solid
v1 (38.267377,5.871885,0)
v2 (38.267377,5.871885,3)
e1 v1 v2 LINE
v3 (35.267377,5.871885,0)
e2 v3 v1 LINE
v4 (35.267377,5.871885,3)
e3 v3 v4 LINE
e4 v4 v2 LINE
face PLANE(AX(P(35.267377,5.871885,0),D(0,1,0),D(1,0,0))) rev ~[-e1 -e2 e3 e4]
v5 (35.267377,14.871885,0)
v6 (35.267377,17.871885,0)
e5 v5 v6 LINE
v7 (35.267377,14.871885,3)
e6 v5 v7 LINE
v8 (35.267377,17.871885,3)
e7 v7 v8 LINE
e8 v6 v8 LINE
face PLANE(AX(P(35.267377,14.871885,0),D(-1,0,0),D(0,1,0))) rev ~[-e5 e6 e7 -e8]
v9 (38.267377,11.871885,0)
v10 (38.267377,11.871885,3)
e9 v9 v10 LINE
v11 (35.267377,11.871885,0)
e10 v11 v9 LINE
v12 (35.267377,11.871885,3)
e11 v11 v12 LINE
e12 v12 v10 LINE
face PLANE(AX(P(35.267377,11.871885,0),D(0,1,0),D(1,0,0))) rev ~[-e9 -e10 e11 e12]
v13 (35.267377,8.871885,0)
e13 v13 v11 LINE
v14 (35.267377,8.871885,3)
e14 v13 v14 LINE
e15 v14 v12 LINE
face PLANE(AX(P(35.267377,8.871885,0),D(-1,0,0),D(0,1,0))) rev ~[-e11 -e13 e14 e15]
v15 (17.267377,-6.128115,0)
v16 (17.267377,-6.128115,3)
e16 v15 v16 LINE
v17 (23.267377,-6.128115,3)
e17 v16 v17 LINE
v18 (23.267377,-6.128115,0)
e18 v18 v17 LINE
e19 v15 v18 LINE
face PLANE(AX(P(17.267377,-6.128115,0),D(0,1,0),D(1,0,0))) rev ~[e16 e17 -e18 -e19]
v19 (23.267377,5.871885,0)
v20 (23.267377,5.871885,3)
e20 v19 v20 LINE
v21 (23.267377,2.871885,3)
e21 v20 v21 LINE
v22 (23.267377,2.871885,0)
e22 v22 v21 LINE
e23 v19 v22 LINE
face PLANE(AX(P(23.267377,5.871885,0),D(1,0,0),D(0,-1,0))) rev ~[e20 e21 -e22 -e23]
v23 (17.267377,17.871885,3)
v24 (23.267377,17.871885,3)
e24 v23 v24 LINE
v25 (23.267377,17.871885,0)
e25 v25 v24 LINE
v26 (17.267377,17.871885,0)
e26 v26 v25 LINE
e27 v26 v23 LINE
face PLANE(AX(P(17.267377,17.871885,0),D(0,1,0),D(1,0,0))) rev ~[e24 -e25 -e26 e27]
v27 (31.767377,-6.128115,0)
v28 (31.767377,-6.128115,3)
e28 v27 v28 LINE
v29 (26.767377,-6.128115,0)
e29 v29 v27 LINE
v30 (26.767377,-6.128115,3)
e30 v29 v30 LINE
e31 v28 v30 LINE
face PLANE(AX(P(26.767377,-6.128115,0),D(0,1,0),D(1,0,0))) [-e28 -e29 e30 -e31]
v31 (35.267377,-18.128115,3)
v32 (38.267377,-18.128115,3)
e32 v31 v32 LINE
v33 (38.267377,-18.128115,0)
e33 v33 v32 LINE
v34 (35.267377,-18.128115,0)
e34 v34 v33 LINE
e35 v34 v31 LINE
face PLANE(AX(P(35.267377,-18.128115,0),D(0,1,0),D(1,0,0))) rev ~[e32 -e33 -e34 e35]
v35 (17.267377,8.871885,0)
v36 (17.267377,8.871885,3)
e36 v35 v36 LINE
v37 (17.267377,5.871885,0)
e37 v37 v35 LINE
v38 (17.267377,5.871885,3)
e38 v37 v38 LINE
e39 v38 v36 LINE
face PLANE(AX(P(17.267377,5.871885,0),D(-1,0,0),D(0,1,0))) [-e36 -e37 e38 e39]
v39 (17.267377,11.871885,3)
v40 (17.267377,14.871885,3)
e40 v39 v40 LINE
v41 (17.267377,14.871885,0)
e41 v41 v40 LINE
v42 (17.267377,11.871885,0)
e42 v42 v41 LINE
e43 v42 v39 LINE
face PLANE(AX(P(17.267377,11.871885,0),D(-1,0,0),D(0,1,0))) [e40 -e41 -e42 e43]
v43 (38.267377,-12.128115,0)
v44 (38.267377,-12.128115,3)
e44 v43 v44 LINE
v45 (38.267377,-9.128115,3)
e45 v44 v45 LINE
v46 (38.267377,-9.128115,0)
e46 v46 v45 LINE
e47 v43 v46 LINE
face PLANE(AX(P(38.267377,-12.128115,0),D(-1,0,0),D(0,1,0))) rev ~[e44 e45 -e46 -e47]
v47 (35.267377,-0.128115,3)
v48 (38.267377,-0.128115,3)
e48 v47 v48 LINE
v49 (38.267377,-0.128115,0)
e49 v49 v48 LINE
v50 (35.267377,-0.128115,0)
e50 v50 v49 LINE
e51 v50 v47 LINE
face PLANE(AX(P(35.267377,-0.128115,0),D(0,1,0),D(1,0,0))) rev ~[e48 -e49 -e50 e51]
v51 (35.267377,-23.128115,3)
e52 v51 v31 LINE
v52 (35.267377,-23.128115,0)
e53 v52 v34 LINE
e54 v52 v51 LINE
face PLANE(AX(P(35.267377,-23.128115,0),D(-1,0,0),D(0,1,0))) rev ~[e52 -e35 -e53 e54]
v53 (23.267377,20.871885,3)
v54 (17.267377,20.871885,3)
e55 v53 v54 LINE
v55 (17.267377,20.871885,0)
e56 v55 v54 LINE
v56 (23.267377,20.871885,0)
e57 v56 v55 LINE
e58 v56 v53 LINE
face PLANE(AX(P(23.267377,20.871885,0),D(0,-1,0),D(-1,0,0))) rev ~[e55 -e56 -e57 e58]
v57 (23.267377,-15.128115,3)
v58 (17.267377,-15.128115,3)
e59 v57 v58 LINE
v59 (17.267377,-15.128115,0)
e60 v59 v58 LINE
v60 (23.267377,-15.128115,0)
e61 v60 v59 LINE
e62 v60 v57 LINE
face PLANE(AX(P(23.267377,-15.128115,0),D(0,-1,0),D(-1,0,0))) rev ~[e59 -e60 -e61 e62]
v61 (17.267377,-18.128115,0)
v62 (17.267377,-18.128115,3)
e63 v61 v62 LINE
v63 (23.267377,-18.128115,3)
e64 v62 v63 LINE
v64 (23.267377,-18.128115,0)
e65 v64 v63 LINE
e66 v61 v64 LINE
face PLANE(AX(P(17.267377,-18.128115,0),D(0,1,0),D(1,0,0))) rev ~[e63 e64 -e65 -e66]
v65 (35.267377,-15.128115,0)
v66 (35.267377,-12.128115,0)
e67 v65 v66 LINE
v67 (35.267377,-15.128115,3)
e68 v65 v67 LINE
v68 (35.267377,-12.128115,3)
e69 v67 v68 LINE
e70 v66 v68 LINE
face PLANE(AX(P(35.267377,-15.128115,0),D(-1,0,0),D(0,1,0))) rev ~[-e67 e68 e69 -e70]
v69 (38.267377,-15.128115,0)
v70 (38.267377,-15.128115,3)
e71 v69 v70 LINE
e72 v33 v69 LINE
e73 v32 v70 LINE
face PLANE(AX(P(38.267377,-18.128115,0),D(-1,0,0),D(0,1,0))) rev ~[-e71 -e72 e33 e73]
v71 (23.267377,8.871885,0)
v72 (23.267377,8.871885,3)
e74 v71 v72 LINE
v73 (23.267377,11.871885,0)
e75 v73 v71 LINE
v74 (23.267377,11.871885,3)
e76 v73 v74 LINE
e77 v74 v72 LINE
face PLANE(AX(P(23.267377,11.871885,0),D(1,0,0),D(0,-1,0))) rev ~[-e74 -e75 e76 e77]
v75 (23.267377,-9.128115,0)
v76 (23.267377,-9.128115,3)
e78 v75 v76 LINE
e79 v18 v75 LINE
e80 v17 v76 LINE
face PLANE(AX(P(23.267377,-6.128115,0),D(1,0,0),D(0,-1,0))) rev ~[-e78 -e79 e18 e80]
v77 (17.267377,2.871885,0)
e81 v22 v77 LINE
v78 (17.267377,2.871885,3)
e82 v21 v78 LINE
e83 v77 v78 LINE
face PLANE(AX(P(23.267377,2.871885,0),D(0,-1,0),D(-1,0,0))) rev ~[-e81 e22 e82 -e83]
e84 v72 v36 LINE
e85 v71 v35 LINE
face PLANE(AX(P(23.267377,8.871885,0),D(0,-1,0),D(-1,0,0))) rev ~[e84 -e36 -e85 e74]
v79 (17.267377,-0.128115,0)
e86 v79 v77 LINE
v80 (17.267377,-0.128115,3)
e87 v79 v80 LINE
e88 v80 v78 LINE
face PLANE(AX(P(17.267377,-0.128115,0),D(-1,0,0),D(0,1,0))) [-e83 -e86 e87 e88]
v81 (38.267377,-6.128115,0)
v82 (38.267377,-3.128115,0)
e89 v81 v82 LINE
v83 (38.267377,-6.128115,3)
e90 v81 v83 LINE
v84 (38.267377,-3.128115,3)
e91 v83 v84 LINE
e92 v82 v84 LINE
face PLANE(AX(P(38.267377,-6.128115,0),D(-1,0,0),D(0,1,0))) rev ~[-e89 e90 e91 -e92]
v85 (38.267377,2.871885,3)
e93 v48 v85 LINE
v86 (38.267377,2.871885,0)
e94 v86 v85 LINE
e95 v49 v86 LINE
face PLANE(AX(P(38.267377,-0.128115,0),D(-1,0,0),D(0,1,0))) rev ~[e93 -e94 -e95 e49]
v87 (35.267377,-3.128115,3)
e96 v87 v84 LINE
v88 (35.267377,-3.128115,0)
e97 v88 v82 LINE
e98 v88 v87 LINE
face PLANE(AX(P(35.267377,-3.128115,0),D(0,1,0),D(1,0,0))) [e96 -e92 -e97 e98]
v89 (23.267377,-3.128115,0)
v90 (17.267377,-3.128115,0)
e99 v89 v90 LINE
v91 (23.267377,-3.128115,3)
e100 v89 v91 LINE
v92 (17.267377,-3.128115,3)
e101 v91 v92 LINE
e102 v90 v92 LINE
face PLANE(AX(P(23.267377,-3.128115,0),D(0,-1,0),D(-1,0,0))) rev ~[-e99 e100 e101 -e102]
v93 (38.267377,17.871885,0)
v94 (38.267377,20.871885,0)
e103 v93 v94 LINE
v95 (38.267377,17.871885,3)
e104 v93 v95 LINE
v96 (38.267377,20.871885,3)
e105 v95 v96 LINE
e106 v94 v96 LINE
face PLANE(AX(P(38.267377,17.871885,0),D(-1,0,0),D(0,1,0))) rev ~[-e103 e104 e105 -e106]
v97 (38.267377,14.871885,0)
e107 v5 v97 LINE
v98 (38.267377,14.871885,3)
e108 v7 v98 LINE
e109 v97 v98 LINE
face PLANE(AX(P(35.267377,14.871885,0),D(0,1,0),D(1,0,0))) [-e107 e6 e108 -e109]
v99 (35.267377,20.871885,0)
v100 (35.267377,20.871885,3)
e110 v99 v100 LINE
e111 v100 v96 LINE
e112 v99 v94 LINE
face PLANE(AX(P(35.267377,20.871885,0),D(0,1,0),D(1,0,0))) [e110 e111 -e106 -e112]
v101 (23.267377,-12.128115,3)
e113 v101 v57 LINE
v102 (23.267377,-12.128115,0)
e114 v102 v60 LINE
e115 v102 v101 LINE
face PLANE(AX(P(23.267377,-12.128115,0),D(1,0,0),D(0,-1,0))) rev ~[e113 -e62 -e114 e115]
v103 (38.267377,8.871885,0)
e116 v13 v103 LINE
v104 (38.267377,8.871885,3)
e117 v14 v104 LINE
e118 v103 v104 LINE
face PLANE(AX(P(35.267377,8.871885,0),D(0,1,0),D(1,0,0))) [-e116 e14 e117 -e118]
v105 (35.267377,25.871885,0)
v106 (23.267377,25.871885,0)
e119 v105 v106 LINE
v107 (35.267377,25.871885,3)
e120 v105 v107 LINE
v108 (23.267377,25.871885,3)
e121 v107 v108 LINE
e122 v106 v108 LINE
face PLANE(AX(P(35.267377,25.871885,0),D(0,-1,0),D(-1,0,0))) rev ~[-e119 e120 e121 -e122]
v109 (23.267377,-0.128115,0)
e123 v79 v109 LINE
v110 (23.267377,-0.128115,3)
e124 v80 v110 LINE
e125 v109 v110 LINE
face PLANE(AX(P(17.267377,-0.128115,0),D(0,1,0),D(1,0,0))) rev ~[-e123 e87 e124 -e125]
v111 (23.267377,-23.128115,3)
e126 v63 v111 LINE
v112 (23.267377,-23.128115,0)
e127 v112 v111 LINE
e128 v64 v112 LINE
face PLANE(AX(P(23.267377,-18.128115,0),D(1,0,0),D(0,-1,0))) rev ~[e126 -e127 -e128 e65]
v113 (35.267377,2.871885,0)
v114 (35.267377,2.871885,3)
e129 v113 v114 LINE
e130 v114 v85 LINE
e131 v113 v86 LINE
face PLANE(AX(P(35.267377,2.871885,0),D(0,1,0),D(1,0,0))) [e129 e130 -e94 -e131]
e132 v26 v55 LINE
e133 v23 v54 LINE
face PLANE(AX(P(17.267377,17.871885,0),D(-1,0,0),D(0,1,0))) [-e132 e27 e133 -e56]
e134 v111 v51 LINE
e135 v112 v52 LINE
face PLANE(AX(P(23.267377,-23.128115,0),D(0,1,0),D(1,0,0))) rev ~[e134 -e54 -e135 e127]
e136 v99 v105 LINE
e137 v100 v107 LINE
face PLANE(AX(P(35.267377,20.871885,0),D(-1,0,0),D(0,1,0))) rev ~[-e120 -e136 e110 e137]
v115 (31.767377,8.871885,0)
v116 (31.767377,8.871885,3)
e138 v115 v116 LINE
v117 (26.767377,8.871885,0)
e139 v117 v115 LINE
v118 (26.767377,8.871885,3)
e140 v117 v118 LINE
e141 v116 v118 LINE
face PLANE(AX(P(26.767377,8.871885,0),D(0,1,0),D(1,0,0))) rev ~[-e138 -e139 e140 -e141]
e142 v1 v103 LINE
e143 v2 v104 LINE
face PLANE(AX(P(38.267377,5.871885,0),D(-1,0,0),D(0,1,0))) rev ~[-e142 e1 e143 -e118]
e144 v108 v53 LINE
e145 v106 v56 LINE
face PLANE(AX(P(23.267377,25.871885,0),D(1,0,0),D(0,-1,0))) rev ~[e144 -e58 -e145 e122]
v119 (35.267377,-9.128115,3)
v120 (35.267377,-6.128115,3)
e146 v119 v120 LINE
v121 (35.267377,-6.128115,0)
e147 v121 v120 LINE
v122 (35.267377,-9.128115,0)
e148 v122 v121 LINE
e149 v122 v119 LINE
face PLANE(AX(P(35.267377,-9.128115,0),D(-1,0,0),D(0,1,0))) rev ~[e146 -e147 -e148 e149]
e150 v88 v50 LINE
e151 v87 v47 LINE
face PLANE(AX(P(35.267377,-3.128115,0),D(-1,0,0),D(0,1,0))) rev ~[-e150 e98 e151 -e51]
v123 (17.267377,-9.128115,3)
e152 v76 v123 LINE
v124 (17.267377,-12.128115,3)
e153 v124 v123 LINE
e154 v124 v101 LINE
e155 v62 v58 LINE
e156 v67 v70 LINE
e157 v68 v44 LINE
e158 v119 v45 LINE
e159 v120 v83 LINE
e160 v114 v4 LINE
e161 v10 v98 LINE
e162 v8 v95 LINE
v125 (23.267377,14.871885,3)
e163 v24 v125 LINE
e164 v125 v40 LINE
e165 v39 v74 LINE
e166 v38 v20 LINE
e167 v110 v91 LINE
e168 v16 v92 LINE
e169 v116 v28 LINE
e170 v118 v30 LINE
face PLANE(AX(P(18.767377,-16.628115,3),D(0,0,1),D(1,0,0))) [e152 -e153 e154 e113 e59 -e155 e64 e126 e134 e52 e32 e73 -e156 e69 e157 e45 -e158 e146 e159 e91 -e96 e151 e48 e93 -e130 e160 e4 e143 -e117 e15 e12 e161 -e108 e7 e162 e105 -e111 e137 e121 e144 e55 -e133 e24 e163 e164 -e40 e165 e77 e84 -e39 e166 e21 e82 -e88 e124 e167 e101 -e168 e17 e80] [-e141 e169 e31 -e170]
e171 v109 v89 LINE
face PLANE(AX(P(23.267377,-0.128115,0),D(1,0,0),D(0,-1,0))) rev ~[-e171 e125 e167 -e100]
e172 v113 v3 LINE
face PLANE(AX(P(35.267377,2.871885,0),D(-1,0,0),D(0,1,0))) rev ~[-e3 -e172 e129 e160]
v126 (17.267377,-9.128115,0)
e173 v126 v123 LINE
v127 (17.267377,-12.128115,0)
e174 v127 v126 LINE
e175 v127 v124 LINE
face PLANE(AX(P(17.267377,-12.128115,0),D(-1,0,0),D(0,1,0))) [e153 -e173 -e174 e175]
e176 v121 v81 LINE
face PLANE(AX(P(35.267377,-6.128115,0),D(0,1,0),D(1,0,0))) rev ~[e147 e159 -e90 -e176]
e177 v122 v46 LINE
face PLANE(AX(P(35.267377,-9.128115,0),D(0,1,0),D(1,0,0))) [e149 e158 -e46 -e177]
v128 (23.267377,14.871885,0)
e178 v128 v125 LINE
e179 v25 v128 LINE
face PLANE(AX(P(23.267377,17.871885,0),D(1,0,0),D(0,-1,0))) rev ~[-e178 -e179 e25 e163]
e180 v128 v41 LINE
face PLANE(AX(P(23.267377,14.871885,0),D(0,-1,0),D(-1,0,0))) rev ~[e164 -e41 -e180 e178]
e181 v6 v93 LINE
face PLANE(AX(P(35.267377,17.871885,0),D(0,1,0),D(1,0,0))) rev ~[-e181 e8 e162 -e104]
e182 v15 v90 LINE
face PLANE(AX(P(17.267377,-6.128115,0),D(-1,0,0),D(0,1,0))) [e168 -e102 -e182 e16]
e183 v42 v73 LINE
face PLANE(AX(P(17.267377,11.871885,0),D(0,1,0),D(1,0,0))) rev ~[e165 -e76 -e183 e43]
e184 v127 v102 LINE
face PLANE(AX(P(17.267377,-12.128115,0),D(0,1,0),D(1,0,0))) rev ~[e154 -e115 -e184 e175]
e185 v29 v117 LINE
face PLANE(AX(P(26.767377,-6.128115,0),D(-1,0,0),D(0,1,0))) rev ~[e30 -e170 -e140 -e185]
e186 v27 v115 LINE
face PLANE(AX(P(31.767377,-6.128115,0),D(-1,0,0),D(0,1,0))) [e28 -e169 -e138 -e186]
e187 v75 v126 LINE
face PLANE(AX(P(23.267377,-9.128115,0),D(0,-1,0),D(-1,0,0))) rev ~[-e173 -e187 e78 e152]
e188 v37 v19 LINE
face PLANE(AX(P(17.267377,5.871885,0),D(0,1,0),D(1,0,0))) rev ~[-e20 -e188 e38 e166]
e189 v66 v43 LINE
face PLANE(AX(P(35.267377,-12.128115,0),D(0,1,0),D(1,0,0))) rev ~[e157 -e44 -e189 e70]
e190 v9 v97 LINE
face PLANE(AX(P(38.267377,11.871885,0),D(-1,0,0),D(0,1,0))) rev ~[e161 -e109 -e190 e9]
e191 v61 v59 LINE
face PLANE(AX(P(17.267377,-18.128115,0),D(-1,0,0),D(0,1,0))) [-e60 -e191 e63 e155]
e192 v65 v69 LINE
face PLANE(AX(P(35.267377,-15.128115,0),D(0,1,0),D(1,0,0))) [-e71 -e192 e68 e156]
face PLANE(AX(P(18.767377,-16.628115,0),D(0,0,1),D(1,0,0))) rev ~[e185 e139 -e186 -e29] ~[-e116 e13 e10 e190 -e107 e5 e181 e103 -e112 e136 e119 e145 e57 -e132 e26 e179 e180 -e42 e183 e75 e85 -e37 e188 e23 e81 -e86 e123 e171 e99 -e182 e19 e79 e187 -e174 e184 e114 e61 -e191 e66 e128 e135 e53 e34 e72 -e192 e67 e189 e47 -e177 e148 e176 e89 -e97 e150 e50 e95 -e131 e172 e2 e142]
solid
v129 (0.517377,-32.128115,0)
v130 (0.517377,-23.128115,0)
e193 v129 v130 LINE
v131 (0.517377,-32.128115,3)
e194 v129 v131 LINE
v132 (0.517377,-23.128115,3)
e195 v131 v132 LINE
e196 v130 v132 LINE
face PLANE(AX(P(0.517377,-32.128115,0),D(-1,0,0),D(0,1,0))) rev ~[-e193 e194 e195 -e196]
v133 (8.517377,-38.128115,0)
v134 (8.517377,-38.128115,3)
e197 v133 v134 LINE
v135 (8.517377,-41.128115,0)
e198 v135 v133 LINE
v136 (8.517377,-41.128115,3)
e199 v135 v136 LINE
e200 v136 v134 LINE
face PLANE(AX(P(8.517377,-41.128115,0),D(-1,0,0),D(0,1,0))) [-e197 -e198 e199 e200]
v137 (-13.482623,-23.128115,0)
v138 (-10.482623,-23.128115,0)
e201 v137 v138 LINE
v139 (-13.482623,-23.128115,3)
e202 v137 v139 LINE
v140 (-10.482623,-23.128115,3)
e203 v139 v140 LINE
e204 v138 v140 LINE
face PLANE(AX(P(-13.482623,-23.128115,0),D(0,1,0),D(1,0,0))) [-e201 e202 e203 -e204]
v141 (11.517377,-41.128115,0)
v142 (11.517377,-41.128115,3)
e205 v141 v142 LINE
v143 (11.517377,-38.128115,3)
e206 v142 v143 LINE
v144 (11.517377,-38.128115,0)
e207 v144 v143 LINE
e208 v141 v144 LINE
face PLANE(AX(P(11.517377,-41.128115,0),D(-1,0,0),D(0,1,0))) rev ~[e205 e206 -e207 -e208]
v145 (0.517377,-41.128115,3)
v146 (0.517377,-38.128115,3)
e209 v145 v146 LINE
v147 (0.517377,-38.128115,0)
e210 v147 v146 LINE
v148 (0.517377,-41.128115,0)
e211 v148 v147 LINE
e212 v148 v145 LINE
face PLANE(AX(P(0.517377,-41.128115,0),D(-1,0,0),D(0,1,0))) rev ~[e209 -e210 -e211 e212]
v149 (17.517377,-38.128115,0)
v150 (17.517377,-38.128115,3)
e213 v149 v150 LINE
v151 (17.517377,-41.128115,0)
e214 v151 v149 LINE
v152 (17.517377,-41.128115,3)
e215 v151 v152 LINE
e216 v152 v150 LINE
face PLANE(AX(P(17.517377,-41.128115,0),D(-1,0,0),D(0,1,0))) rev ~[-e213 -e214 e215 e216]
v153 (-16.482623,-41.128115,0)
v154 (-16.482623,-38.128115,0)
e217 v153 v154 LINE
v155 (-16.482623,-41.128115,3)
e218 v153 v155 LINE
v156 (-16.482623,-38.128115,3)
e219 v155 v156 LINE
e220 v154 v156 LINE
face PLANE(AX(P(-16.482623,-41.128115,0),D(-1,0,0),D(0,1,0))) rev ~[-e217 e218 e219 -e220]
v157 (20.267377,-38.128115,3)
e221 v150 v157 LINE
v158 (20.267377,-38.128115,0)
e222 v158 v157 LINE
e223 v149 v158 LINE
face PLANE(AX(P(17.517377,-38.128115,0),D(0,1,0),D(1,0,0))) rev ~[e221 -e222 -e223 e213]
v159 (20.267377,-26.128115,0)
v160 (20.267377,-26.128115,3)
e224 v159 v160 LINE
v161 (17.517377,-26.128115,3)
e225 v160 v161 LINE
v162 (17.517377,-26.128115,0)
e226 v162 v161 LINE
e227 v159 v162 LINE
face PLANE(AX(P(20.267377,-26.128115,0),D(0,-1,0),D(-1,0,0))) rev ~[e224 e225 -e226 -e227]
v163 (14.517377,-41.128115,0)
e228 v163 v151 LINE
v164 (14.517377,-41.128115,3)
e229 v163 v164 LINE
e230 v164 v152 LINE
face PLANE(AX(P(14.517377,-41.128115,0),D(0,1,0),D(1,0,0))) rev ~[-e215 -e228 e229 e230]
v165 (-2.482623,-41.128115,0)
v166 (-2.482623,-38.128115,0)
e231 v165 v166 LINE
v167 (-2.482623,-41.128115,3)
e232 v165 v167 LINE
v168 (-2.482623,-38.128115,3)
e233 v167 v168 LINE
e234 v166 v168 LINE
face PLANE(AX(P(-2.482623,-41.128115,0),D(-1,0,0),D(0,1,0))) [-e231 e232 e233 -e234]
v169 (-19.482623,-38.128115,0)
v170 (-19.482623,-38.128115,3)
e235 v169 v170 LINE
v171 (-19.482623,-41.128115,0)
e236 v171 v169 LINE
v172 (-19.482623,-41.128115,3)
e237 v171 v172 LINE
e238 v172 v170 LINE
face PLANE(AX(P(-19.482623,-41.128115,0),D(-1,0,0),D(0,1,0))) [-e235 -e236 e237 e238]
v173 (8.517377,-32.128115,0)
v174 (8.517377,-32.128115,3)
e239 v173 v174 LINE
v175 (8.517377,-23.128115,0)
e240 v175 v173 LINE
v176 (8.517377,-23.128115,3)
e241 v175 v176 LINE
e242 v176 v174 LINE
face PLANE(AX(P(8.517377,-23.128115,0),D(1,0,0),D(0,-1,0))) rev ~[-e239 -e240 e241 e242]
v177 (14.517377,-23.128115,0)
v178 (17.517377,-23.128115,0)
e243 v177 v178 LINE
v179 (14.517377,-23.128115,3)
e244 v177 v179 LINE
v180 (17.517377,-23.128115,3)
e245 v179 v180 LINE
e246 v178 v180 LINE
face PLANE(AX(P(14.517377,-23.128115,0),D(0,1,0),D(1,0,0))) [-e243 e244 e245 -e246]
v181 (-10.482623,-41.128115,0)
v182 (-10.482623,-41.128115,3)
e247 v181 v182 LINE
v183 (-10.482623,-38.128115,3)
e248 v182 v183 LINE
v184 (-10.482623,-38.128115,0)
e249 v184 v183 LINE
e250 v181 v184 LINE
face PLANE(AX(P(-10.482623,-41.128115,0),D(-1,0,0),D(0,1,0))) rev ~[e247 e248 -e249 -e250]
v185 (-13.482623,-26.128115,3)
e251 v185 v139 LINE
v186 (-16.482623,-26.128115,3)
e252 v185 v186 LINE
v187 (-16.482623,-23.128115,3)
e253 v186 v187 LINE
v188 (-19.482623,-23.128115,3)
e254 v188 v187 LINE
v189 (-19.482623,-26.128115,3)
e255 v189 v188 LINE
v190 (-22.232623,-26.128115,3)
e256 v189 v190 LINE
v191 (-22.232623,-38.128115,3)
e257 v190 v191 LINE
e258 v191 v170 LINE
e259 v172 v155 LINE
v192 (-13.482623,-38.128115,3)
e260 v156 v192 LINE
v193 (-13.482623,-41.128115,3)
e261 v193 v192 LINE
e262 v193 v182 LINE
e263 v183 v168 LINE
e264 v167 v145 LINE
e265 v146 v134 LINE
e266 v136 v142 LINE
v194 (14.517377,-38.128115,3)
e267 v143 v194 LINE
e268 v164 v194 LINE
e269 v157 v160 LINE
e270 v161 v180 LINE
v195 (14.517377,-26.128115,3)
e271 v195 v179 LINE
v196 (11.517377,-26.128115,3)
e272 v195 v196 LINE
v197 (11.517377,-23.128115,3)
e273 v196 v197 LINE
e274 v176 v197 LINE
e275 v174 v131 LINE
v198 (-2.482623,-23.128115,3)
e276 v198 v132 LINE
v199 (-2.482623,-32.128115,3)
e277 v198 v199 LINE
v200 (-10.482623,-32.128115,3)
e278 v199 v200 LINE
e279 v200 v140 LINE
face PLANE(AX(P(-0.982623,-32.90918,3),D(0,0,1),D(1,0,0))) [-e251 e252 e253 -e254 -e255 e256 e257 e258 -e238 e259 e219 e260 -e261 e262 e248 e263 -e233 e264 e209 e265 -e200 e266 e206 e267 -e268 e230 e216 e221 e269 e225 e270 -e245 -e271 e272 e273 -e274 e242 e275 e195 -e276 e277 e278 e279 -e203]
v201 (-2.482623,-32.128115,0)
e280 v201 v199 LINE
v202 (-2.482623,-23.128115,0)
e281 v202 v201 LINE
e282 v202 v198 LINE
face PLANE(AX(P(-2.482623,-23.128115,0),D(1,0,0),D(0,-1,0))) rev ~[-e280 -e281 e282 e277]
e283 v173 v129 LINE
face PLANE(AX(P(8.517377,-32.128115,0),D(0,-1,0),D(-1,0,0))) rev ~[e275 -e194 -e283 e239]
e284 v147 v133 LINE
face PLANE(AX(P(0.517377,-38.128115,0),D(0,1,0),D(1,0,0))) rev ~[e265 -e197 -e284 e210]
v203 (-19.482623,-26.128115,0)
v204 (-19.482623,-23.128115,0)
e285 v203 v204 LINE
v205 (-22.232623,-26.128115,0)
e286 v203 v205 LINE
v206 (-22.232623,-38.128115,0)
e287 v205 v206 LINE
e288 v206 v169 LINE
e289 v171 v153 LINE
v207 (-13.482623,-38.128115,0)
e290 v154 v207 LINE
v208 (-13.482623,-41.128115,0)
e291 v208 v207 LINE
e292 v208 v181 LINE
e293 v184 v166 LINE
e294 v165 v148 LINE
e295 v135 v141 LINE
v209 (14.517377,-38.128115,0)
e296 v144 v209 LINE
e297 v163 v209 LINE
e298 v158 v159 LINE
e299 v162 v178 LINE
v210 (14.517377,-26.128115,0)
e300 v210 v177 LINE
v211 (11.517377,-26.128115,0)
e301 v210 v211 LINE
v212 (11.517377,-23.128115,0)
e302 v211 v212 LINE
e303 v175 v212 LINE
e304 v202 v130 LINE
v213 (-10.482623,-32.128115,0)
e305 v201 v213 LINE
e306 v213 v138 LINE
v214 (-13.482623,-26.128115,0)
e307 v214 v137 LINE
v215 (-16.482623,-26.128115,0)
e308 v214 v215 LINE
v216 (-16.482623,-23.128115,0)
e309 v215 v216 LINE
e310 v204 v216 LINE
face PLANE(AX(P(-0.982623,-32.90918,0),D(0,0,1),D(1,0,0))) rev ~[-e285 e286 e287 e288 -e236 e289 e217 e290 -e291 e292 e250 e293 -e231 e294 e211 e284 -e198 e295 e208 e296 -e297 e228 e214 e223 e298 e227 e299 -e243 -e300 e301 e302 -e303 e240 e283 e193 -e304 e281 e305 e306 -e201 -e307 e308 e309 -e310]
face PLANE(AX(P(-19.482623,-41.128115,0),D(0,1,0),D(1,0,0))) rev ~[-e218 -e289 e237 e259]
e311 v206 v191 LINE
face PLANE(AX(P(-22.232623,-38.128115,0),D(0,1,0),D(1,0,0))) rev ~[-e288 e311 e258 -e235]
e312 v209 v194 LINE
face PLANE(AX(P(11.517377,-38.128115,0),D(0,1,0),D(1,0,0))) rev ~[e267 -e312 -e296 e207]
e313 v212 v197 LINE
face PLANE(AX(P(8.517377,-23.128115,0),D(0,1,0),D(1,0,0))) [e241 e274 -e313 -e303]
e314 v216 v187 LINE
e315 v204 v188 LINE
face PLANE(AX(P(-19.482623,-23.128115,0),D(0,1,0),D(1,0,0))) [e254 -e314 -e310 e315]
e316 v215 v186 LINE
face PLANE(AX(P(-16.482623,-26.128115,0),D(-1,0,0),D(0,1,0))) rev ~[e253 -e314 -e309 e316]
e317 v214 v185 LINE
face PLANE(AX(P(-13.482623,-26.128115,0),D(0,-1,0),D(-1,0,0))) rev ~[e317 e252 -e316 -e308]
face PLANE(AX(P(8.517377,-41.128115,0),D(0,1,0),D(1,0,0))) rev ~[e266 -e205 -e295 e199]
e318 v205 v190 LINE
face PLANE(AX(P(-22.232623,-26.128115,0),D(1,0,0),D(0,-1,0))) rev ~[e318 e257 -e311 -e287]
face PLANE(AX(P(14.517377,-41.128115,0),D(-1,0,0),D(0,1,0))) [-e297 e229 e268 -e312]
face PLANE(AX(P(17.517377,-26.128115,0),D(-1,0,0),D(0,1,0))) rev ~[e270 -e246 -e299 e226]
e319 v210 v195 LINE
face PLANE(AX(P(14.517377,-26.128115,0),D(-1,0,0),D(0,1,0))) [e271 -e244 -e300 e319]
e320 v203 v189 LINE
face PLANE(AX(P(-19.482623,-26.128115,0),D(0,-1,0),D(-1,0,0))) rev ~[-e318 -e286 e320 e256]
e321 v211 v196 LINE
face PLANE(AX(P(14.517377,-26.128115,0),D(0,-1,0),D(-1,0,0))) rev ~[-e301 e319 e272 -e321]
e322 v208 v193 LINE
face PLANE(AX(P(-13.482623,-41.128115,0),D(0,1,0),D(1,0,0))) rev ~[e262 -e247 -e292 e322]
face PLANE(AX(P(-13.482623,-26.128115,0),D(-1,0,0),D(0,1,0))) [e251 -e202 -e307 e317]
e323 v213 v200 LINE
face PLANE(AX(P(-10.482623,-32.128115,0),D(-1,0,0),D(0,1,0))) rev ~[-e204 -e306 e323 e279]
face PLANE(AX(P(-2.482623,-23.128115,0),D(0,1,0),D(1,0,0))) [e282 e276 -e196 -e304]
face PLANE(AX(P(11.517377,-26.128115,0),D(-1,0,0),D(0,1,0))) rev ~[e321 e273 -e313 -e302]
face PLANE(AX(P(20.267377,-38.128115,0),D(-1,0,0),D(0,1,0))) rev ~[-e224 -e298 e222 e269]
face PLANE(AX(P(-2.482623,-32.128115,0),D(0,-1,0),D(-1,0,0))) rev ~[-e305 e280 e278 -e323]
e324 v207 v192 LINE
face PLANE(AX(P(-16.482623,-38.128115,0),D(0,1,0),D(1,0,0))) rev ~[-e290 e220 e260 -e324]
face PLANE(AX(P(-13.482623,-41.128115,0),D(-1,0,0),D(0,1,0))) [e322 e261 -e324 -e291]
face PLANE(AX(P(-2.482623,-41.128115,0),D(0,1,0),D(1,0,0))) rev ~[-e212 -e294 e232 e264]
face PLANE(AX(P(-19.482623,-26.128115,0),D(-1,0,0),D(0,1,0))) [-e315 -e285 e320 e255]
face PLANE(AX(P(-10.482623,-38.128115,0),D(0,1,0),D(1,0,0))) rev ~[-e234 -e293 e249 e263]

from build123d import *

# Parameters (mm, degrees)
F0_W     = 3
F0_H     = 3
F1_DEPTH = 3
F2_W     = 5
F2_H     = 15
F3_DEPTH = 25


# Not quite as in the source:
# - a feature names something its author has since deleted; it is built from what else it names


with BuildPart() as f1:
    # F0 (on Top) → F1 (new body)
    with BuildSketch(Plane.XY):
        Polygon((20.2673766234, -38.1281147589), (20.2673766234, -26.1281147589), (17.5173766234, -26.1281147589), (17.5173766234, -29.1281147589), (14.5173766234, -29.1281147589), (14.5173766234, -26.1281147589), (11.5173766234, -26.1281147589), (11.5173766234, -29.1281147589), (8.5173766234, -29.1281147589), (8.5173766234, -32.1281147589), (0.5173766234, -32.1281147589), (0.5173766234, -29.1281147589), (-2.4826233766, -29.1281147589), (-2.4826233766, -32.1281147589), (-10.4826233766, -32.1281147589), (-10.4826233766, -29.1281147589), (-13.4826233766, -29.1281147589), (-13.4826233766, -26.1281147589), (-16.4826233766, -26.1281147589), (-16.4826233766, -29.1281147589), (-19.4826233766, -29.1281147589), (-19.4826233766, -26.1281147589), (-22.2326233766, -26.1281147589), (-22.2326233766, -32.1281147589), (-22.2326233766, -38.1281147589), (-19.4826233766, -38.1281147589), (-19.4826233766, -35.1281147589), (-16.4826233766, -35.1281147589), (-16.4826233766, -38.1281147589), (-13.4826233766, -38.1281147589), (-13.4826233766, -35.1281147589), (-10.4826233766, -35.1281147589), (-10.4826233766, -38.1281147589), (-2.4826233766, -38.1281147589), (-2.4826233766, -35.1281147589), (0.5173766234, -35.1281147589), (0.5173766234, -38.1281147589), (8.5173766234, -38.1281147589), (8.5173766234, -35.1281147589), (11.5173766234, -35.1281147589), (11.5173766234, -38.1281147589), (14.5173766234, -38.1281147589), (14.5173766234, -35.1281147589), (17.5173766234, -35.1281147589), (17.5173766234, -38.1281147589), align=None)
        with Locations((16.0173766234, -27.6281147589)):
            Rectangle(F0_W, F0_H)
        with Locations((16.0173766234, -24.6281147589)):
            Rectangle(F0_W, F0_H)
        with Locations((16.0173766234, -39.6281147589)):
            Rectangle(F0_W, F0_H)
        with Locations((16.0173766234, -36.6281147589)):
            Rectangle(F0_W, F0_H)
        with Locations((10.0173766234, -27.6281147589)):
            Rectangle(F0_W, F0_H)
        with Locations((10.0173766234, -24.6281147589)):
            Rectangle(F0_W, F0_H)
        with Locations((10.0173766234, -39.6281147589)):
            Rectangle(F0_W, F0_H)
        with Locations((10.0173766234, -36.6281147589)):
            Rectangle(F0_W, F0_H)
        Polygon((0.5173766234, -27.6126158823), (0.5173766234, -26.1281147589), (-2.4826233766, -26.1281147589), (-2.4826233766, -29.1281147589), (0.5173766234, -29.1281147589), align=None)
        with Locations((-0.9826233766, -24.6281147589)):
            Rectangle(F0_W, F0_H)
        with Locations((-0.9826233766, -39.6281147589)):
            Rectangle(F0_W, F0_H)
        with Locations((-0.9826233766, -36.6281147589)):
            Rectangle(F0_W, F0_H)
        with Locations((-11.9826233766, -27.6281147589)):
            Rectangle(F0_W, F0_H)
        with Locations((-11.9826233766, -24.6281147589)):
            Rectangle(F0_W, F0_H)
        with Locations((-11.9826233766, -39.6281147589)):
            Rectangle(F0_W, F0_H)
        with Locations((-11.9826233766, -36.6281147589)):
            Rectangle(F0_W, F0_H)
        with Locations((-17.9826233766, -27.6281147589)):
            Rectangle(F0_W, F0_H)
        with Locations((-17.9826233766, -24.6281147589)):
            Rectangle(F0_W, F0_H)
        with Locations((-17.9826233766, -39.6281147589)):
            Rectangle(F0_W, F0_H)
        with Locations((-17.9826233766, -36.6281147589)):
            Rectangle(F0_W, F0_H)
    extrude(amount=F1_DEPTH)


with BuildPart() as f1b:
    # F0 (on Top) → F1, piece 2 (new body)
    with BuildSketch(Plane.XY):
        with Locations((18.7673766234, -16.6281147589)):
            Rectangle(F0_W, F0_H)
        with Locations((21.7673766234, -16.6281147589)):
            Rectangle(F0_W, F0_H)
        Polygon((23.2673766234, -15.1281147589), (23.2673766234, -18.1281147589), (23.2673766234, -23.1281147589), (35.2673766234, -23.1281147589), (35.2673766234, -18.1281147589), (35.2673766234, -15.1281147589), (35.2673766234, -12.1281147589), (35.2673766234, -9.1281147589), (35.2673766234, -6.1281147589), (35.2673766234, -3.1281147589), (35.2673766234, -0.1281147589), (35.2673766234, 2.8718852411), (35.2673766234, 5.8718852411), (35.2673766234, 8.8718852411), (35.2673766234, 11.8718852411), (35.2673766234, 14.8718852411), (35.2673766234, 17.8718852411), (35.2673766234, 20.8718852411), (35.2673766234, 25.8718852411), (29.2673766234, 25.8718852411), (23.2673766234, 25.8718852411), (23.2673766234, 20.8718852411), (23.2673766234, 17.8718852411), (23.2673766234, 14.8718852411), (23.2673766234, 11.8718852411), (23.2673766234, 8.8718852411), (23.2673766234, 5.8718852411), (23.2673766234, 2.8718852411), (23.2673766234, -0.1281147589), (23.2673766234, -3.1281147589), (23.2673766234, -6.1281147589), (23.2673766234, -9.1281147589), (23.2673766234, -12.1281147589), align=None)
        with Locations((18.7673766234, -10.6281147589)):
            Rectangle(F0_W, F0_H)
        with Locations((21.7673766234, -10.6281147589)):
            Rectangle(F0_W, F0_H)
        with Locations((18.7673766234, -4.6281147589)):
            Rectangle(F0_W, F0_H)
        with Locations((21.7673766234, -4.6281147589)):
            Rectangle(F0_W, F0_H)
        with Locations((36.7673766234, -16.6281147589)):
            Rectangle(F0_W, F0_H)
        with Locations((18.7673766234, 1.3718852411)):
            Rectangle(F0_W, F0_H)
        with Locations((21.7673766234, 1.3718852411)):
            Rectangle(F0_W, F0_H)
        with Locations((36.7673766234, -10.6281147589)):
            Rectangle(F0_W, F0_H)
        with Locations((18.7673766234, 7.3718852411)):
            Rectangle(F0_W, F0_H)
        with Locations((21.7673766234, 7.3718852411)):
            Rectangle(F0_W, F0_H)
        with Locations((36.7673766234, -4.6281147589)):
            Rectangle(F0_W, F0_H)
        with Locations((18.7673766234, 13.3718852411)):
            Rectangle(F0_W, F0_H)
        with Locations((21.7673766234, 13.3718852411)):
            Rectangle(F0_W, F0_H)
        with Locations((36.7673766234, 1.3718852411)):
            Rectangle(F0_W, F0_H)
        with Locations((18.7673766234, 19.3718852411)):
            Rectangle(F0_W, F0_H)
        with Locations((21.7673766234, 19.3718852411)):
            Rectangle(F0_W, F0_H)
        with Locations((36.7673766234, 7.3718852411)):
            Rectangle(F0_W, F0_H)
        with Locations((36.7673766234, 13.3718852411)):
            Rectangle(F0_W, F0_H)
        with Locations((36.7673766234, 19.3718852411)):
            Rectangle(F0_W, F0_H)
    extrude(amount=F1_DEPTH)

    # F2 (on Top) → F3 (cut)
    with BuildSketch(Plane.XY):
        with Locations((29.2673766234, 1.3718852411)):
            Rectangle(F2_W, F2_H)
    extrude(amount=F3_DEPTH, mode=Mode.SUBTRACT)


solid = Compound([f1.part, f1b.part])
